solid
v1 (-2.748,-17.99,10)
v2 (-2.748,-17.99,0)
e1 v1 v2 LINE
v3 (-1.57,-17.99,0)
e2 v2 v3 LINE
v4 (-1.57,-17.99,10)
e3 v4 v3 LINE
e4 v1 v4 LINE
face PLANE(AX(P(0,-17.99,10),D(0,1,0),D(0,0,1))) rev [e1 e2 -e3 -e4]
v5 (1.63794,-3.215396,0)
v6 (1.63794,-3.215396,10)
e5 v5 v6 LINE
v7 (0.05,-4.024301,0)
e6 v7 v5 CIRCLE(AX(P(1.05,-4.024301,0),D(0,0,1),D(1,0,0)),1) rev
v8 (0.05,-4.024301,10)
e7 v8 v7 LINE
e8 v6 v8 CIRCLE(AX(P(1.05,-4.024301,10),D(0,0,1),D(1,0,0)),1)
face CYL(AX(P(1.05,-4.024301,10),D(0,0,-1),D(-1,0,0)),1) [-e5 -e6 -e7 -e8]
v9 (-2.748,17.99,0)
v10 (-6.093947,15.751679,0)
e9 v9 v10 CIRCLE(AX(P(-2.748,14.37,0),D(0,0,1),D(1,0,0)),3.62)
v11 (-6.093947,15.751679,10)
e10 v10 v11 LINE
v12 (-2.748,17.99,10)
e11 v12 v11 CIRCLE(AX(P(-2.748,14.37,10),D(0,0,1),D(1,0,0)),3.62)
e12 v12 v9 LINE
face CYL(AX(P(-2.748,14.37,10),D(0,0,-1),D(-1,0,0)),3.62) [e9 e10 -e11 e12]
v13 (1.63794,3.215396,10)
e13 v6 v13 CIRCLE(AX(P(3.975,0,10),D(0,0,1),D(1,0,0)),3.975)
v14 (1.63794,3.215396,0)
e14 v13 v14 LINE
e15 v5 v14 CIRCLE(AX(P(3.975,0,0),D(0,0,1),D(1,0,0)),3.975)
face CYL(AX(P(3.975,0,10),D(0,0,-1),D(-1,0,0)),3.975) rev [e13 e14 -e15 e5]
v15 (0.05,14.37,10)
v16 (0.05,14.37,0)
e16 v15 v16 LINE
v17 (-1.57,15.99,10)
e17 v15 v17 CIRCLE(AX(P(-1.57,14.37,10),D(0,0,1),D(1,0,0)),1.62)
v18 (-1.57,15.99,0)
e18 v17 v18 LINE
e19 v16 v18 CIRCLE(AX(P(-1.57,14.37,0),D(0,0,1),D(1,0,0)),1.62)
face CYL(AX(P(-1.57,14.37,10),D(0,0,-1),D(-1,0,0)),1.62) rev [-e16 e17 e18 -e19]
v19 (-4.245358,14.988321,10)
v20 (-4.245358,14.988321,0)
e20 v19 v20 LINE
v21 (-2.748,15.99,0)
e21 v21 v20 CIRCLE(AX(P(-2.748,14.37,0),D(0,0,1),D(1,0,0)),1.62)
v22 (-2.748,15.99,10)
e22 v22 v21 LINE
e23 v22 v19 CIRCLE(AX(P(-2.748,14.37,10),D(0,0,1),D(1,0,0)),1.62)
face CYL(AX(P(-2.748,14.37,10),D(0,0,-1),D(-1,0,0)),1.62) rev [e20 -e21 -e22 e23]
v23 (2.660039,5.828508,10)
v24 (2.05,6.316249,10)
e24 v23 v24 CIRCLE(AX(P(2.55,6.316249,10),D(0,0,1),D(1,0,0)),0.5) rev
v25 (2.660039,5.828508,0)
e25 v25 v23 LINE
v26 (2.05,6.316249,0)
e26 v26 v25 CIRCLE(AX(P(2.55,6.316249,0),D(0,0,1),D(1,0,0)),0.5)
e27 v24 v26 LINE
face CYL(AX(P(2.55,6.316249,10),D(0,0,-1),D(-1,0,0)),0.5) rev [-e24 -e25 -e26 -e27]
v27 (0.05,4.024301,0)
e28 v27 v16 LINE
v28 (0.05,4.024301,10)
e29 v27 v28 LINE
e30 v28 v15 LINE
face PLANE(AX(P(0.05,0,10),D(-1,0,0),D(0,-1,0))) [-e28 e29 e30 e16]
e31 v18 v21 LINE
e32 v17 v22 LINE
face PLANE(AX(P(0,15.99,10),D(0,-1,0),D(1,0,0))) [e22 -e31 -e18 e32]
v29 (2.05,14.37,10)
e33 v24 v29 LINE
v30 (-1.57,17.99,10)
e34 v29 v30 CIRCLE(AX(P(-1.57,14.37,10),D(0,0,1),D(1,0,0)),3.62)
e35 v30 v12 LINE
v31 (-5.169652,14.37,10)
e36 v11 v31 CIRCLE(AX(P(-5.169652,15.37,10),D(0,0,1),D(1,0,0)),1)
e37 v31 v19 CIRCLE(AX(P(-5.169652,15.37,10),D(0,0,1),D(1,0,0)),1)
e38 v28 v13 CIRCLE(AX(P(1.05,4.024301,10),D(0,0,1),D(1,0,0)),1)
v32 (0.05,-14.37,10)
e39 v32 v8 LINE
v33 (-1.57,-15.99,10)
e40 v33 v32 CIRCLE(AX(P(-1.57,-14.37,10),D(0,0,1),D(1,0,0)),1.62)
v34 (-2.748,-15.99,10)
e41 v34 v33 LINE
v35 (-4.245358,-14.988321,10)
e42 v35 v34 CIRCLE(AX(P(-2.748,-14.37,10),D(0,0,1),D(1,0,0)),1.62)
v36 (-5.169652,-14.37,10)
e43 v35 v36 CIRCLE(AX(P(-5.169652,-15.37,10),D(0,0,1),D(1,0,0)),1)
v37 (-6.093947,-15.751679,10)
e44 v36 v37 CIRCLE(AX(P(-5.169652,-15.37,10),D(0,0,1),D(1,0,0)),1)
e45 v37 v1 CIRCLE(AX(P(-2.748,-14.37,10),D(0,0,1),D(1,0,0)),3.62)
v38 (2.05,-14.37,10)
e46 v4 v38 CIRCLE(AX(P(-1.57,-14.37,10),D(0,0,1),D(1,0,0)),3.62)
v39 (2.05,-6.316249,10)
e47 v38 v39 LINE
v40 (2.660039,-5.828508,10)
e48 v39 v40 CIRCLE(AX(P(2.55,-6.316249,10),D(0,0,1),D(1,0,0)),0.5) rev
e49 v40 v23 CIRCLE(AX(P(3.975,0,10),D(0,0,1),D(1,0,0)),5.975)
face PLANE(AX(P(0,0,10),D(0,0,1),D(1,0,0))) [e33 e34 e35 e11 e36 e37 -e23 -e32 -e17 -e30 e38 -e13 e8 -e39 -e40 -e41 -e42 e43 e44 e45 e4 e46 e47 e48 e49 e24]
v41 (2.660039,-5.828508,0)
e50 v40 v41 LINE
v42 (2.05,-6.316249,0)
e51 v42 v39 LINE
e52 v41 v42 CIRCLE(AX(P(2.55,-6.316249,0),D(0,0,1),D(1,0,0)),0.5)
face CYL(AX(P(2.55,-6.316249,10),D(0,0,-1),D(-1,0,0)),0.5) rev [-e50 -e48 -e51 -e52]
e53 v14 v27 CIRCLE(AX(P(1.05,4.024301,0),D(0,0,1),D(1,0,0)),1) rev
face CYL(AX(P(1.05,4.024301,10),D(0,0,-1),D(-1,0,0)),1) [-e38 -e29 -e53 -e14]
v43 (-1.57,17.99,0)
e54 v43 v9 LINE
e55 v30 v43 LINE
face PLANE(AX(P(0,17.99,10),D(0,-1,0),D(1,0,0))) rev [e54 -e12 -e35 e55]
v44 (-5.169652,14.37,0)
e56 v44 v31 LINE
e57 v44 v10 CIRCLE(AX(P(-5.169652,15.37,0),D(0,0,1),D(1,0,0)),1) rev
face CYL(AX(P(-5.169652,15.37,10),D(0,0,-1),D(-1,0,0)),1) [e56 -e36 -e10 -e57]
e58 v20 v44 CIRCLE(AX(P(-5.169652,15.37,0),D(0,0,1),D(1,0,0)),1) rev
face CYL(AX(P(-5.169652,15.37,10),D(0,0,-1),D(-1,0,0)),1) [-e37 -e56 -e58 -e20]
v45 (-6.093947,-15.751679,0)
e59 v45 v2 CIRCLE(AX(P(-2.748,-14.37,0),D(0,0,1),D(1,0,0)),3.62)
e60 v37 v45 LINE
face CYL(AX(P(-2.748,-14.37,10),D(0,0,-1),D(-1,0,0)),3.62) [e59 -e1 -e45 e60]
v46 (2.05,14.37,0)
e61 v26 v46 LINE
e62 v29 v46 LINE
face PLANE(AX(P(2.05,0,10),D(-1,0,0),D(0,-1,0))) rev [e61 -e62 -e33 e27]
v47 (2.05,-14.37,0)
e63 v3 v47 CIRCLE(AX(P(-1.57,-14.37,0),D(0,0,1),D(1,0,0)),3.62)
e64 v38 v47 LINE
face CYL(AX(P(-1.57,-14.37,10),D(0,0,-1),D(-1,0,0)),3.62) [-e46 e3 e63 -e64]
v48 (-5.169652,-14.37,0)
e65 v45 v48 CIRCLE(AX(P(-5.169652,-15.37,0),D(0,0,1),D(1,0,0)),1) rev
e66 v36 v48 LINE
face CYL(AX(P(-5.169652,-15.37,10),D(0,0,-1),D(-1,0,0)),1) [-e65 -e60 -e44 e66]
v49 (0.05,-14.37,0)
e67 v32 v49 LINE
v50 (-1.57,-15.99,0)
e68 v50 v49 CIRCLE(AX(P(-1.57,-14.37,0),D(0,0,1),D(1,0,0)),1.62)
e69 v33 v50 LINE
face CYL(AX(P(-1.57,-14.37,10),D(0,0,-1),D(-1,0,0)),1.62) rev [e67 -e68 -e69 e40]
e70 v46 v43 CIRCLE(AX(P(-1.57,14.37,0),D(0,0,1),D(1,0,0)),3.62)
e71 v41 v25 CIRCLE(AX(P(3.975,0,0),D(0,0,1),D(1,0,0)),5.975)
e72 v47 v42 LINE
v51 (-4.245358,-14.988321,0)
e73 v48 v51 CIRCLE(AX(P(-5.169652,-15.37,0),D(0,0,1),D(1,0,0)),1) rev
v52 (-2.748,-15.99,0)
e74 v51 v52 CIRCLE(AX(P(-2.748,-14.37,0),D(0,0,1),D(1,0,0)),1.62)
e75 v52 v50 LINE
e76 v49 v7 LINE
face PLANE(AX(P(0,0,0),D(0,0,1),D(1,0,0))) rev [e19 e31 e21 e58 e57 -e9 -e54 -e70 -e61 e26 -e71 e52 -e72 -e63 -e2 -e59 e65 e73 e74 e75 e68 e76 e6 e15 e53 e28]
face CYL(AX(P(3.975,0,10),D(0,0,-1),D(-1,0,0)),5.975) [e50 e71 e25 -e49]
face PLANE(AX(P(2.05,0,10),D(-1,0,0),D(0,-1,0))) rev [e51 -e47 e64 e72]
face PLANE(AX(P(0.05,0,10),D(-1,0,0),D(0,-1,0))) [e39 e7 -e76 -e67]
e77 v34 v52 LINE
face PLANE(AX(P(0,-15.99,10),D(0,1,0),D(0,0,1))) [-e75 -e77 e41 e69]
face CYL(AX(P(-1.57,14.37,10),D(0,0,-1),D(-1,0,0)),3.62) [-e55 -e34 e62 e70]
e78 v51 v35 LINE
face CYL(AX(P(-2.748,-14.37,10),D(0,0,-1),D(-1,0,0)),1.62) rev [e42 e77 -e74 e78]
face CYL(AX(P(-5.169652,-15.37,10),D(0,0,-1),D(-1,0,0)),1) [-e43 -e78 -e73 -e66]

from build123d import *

# Parameters (mm, degrees)
BOSS_EXTRUDE1_DEPTH = 10
FILLET1_R           = 1
FILLET2_R           = 0.5
FILLET3_R           = 1


with BuildPart() as part:
    # Sketch1 → Boss-Extrude1 (new body)
    with BuildSketch(Plane.XY):
        with BuildLine():
            Line((0.05, 14.37), (0.05, 4.504997225))
            ThreePointArc((0.05, 4.504997225), (0.993882062, 5.178181229), (2.05, 5.65641229))
            Line((2.05, 5.65641229), (2.05, 14.37))
            ThreePointArc((2.05, 14.37), (0.989726548, 16.929726548), (-1.57, 17.99))
            Line((-1.57, 17.99), (-2.748, 17.99))
            ThreePointArc((-2.748, 17.99), (-5.307726548, 16.929726548), (-6.368, 14.37))
            Line((-6.368, 14.37), (-4.368, 14.37))
            ThreePointArc((-4.368, 14.37), (-3.893512986, 15.515512986), (-2.748, 15.99))
            Line((-2.748, 15.99), (-1.57, 15.99))
            ThreePointArc((-1.57, 15.99), (-0.424487014, 15.515512986), (0.05, 14.37))
        make_face()
        with BuildLine():
            Line((0.05, -0.628490254), (0.05, -4.504997225))
            ThreePointArc((0.05, -4.504997225), (0.993882062, -5.178181229), (2.05, -5.65641229))
            Line((2.05, -5.65641229), (2.05, -3.477786652))
            ThreePointArc((2.05, -3.477786652), (0.721502268, -2.283720103), (0.05, -0.628490254))
        make_face()
        with BuildLine():
            ThreePointArc((2.05, 5.65641229), (0.993882062, 5.178181229), (0.05, 4.504997225))
            Line((0.05, 4.504997225), (0.05, 0.628490254))
            ThreePointArc((0.05, 0.628490254), (0.721502268, 2.283720103), (2.05, 3.477786652))
            Line((2.05, 3.477786652), (2.05, 5.65641229))
        make_face()
        with BuildLine():
            Line((2.05, -3.477786652), (2.05, -5.65641229))
            ThreePointArc((2.05, -5.65641229), (7.453415588, -4.858111773), (9.95, 0))
            ThreePointArc((9.95, 0), (7.453415588, 4.858111773), (2.05, 5.65641229))
            Line((2.05, 5.65641229), (2.05, 3.477786652))
            ThreePointArc((2.05, 3.477786652), (5.993508112, 3.424361254), (7.95, 0))
            ThreePointArc((7.95, 0), (5.993508112, -3.424361254), (2.05, -3.477786652))
        make_face()
        with BuildLine():
            Line((-1.57, -15.99), (-2.748, -15.99))
            ThreePointArc((-2.748, -15.99), (-3.893512986, -15.515512986), (-4.368, -14.37))
            Line((-4.368, -14.37), (-6.368, -14.37))
            ThreePointArc((-6.368, -14.37), (-5.307726548, -16.929726548), (-2.748, -17.99))
            Line((-2.748, -17.99), (-1.57, -17.99))
            ThreePointArc((-1.57, -17.99), (0.989726548, -16.929726548), (2.05, -14.37))
            Line((2.05, -14.37), (2.05, -5.65641229))
            ThreePointArc((2.05, -5.65641229), (0.993882062, -5.178181229), (0.05, -4.504997225))
            Line((0.05, -4.504997225), (0.05, -14.37))
            ThreePointArc((0.05, -14.37), (-0.424487014, -15.515512986), (-1.57, -15.99))
        make_face()
    extrude(amount=BOSS_EXTRUDE1_DEPTH)

    # Fillet1
    fillet1_edges = [part.edges().sort_by_distance(p)[0] for p in [
        (0.05, -0.628490254, 5),
        (0.05, 0.628490254, 5),
    ]]
    fillet(fillet1_edges, radius=FILLET1_R)

    # Fillet2
    fillet2_edges = [part.edges().sort_by_distance(p)[0] for p in [
        (2.05, 5.65641229, 5),
        (2.05, -5.65641229, 5),
    ]]
    fillet(fillet2_edges, radius=FILLET2_R)

    # Fillet3
    fillet3_edges = [part.edges().sort_by_distance(p)[0] for p in [
        (-6.368, 14.37, 5),
        (-4.368, 14.37, 5),
        (-6.368, -14.37, 5),
        (-4.368, -14.37, 5),
    ]]
    fillet(fillet3_edges, radius=FILLET3_R - 0.0001)  # a hair under: the kernel refuses the full size


solid = part.part
